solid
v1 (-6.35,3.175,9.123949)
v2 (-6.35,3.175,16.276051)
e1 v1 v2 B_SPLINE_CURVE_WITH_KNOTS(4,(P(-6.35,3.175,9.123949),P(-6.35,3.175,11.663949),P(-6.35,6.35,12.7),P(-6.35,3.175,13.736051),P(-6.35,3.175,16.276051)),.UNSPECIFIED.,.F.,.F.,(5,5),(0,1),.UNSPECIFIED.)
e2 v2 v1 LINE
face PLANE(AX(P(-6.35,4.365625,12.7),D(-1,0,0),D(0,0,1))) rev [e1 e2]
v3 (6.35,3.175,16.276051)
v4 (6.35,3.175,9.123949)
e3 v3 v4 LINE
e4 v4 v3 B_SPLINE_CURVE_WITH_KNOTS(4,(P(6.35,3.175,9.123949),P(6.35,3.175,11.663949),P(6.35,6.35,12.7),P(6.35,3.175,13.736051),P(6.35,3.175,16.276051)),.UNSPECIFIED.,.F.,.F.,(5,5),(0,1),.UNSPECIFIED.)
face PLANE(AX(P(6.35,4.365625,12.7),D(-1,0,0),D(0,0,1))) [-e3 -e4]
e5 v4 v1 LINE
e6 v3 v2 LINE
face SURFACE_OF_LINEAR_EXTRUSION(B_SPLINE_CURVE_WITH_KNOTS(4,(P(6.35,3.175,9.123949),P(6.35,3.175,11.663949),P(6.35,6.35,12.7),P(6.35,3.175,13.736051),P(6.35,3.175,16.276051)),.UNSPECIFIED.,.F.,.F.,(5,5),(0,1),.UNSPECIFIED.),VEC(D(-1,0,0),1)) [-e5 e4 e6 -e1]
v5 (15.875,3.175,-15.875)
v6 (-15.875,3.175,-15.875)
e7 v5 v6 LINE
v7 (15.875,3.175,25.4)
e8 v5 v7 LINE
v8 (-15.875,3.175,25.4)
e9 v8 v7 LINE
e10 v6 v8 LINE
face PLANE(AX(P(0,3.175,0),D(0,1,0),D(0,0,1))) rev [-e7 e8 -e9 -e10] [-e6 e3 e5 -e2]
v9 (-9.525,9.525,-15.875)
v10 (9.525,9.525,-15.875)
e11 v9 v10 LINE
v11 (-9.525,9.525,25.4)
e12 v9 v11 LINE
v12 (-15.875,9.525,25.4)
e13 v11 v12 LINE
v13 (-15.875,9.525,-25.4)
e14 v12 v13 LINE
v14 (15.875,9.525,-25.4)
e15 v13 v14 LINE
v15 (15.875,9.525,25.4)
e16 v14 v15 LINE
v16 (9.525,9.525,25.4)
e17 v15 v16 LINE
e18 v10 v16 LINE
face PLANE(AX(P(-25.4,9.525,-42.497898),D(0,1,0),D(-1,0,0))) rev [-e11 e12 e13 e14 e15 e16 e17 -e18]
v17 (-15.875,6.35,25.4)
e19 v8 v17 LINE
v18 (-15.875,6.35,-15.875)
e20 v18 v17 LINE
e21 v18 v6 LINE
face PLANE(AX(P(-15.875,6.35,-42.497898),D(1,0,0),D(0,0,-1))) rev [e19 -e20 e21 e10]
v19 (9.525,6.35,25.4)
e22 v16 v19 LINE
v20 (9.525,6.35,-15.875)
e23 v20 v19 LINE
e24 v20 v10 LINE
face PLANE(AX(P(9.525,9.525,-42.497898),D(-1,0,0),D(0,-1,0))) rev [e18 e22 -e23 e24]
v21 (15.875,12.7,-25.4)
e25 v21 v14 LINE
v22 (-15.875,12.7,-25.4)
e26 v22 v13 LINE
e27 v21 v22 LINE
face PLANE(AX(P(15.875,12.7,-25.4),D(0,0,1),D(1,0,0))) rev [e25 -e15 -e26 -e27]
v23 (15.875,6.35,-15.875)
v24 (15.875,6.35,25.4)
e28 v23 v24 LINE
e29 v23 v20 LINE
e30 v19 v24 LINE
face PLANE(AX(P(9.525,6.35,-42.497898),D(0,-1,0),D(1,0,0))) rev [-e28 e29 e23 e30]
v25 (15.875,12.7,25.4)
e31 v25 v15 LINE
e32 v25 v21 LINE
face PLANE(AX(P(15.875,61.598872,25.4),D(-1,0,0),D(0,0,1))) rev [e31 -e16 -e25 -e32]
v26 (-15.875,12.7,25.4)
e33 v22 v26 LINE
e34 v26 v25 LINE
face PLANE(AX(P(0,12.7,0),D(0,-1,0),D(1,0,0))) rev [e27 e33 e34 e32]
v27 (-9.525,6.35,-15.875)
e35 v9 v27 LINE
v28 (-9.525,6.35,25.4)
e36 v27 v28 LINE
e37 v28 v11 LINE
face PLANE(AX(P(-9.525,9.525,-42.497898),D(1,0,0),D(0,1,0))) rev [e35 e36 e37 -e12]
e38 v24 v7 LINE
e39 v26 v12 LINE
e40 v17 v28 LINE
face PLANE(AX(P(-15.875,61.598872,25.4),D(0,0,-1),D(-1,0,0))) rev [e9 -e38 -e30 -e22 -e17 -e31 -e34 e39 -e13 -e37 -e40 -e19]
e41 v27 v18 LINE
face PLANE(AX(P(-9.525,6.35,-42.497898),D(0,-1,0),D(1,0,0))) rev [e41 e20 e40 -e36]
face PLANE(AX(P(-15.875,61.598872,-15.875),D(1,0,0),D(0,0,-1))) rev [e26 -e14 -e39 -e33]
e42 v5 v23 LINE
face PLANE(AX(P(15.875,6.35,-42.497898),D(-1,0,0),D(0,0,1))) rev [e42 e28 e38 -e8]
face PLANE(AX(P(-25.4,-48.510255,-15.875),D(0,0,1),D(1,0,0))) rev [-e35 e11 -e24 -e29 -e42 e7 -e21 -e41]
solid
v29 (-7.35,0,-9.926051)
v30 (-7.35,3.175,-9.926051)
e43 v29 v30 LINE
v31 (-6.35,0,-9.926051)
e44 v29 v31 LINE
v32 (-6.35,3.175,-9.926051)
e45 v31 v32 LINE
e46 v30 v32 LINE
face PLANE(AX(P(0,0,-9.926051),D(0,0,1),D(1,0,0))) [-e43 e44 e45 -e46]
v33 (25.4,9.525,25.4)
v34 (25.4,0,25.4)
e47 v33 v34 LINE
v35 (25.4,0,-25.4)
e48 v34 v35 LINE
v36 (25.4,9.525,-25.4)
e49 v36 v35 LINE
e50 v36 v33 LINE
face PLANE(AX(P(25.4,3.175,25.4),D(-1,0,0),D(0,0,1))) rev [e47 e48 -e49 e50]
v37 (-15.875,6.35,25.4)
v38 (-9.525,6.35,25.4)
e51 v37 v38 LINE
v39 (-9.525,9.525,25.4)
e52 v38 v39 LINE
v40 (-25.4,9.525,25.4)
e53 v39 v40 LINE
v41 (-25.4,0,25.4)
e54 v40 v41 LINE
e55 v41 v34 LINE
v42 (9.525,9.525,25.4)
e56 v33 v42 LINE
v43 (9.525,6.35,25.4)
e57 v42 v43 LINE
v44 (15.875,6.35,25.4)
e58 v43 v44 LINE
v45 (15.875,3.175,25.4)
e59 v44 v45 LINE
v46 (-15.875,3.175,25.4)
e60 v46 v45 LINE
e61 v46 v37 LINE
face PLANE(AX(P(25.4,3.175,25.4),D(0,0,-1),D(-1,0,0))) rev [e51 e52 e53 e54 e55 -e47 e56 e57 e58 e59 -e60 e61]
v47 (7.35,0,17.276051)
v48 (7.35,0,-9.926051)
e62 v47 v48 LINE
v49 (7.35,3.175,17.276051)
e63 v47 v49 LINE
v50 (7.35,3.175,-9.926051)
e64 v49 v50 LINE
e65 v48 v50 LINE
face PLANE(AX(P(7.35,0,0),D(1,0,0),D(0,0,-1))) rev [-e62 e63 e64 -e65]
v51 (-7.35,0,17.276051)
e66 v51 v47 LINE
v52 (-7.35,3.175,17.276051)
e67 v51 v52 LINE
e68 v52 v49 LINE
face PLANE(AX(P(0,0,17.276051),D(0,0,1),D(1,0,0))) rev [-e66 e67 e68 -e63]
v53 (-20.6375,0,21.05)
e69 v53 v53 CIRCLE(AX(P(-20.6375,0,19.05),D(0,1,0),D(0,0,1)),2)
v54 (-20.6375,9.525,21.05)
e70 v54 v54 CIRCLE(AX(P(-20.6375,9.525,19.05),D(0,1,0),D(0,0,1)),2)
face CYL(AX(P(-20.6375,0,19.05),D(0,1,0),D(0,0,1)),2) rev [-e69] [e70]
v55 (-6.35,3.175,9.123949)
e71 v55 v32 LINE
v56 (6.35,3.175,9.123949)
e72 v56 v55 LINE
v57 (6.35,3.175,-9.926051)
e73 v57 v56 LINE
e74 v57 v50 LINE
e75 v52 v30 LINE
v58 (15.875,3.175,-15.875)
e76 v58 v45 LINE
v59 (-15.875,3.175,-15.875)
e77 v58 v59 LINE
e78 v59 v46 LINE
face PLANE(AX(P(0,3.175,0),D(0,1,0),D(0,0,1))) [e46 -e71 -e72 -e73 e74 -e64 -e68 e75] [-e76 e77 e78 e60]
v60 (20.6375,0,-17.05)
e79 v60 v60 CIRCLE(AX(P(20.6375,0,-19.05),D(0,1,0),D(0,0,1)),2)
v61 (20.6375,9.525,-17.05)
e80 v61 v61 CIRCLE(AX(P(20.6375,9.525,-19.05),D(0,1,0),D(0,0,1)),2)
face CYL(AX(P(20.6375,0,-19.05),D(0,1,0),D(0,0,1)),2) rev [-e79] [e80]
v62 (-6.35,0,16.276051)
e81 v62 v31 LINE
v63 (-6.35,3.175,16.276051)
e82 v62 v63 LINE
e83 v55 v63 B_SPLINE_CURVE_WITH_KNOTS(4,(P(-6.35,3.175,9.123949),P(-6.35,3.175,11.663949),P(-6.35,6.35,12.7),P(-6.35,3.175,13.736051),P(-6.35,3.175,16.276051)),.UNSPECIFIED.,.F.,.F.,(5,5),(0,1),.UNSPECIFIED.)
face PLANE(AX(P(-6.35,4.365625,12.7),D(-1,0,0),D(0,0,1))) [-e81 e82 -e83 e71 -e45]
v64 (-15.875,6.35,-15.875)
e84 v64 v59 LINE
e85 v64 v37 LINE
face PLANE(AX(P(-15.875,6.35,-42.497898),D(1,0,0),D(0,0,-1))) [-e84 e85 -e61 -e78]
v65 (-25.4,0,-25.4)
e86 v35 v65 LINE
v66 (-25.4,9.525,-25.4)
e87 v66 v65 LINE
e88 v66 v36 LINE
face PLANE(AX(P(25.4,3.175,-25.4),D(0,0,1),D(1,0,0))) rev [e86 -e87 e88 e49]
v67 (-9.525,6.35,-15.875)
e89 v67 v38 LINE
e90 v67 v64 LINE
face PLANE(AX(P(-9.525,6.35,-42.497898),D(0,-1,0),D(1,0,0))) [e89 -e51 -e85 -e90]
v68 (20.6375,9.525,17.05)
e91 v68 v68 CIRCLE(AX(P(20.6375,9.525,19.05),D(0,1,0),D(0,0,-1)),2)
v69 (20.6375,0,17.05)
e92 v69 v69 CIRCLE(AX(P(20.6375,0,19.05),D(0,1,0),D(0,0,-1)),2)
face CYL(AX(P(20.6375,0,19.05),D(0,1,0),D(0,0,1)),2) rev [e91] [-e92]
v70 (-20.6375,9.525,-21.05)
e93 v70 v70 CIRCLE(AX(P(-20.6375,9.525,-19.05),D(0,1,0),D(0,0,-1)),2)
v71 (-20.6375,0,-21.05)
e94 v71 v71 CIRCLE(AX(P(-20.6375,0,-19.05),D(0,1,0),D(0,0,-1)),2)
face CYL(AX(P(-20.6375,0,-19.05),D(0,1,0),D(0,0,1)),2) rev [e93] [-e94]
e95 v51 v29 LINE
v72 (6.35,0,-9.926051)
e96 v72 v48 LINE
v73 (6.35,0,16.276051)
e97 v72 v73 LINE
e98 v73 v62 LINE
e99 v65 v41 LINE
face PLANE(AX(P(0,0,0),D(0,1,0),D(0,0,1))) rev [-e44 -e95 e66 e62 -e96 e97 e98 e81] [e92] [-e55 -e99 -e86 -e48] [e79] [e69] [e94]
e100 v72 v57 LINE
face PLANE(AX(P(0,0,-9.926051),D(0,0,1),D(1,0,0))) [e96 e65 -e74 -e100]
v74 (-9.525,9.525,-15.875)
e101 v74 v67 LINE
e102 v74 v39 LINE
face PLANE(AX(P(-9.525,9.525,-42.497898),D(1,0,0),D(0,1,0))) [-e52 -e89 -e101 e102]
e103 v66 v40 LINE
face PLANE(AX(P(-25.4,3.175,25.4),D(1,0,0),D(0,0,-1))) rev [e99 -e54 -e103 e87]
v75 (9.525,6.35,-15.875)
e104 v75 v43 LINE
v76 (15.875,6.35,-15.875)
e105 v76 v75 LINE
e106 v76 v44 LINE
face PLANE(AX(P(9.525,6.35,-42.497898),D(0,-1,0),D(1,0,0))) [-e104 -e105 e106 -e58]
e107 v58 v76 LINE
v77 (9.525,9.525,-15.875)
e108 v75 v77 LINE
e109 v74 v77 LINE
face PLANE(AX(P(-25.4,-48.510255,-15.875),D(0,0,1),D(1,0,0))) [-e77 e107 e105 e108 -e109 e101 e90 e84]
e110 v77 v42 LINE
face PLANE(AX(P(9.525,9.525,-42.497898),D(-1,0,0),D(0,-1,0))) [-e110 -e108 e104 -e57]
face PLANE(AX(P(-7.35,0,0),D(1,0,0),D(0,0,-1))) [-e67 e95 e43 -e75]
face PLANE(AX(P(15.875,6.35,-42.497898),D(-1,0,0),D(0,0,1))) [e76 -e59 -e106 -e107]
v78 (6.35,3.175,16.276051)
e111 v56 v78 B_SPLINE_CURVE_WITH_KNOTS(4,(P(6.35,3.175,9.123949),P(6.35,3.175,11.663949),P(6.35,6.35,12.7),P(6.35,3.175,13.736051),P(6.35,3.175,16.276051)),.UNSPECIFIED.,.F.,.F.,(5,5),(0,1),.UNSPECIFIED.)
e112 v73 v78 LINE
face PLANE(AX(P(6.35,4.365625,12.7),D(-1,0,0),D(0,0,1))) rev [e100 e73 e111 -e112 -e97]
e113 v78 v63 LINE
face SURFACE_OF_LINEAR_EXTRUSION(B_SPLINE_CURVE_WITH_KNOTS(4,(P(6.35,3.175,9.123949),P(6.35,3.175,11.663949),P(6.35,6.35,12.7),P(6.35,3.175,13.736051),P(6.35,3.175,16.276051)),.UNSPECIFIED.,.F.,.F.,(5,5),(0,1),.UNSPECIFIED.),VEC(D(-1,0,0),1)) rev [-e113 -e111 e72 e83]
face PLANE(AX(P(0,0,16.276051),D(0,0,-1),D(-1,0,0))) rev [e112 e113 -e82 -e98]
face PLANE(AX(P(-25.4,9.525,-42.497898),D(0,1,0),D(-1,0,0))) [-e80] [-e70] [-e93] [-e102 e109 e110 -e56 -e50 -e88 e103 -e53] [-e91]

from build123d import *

# Parameters (mm, degrees)
SKETCH1_W              = 50.8
SKETCH1_H              = 50.8
BOSS_EXTRUDE1_DEPTH    = 3.175
BOSS_EXTRUDE5_DEPTH    = 6.35
CUT_EXTRUDE1_DEPTH     = 37.061067996
BOSS_EXTRUDE2_DEPTH    = 50.8
BOSS_EXTRUDE6_REACH    = 39.162
SKETCH10_W             = 50.8
SKETCH10_H             = 9.525
SKETCH12_R             = 2
CUT_EXTRUDE2_DEPTH     = 38.162422242
SKETCH15_W             = 31.75
SKETCH15_H             = 41.275
BOSS_EXTRUDE8_DEPTH    = 6.35
SKETCH16_W             = 31.75
SKETCH16_H             = 50.8
BOSS_EXTRUDE9_DEPTH    = 3.175
INTERSECT4_START       = -15.875
INTERSECT4_OUTLINE_W   = 3.175
INTERSECT4_OUTLINE_H   = 50.8
INTERSECT4_DEPTH       = 31.75
INTERSECT4_START_2     = -9.525
INTERSECT4_2_OUTLINE_W = 3.175
INTERSECT4_2_OUTLINE_H = 41.275
INTERSECT4_2_DEPTH     = 19.05
INTERSECT4_3_DEPTH     = 9.525
INTERSECT4_START_3     = 6.35
INTERSECT4_4_DEPTH     = 9.525
INTERSECT4_5_OUTLINE_R = 2
INTERSECT4_5_DEPTH     = 9.525
INTERSECT4_6_OUTLINE_W = 31.75
INTERSECT4_6_OUTLINE_H = 41.275
INTERSECT4_6_DEPTH     = 3.175


with BuildPart() as part:
    # Sketch1 → Boss-Extrude1 (new body)
    with BuildSketch(Plane(origin=(0, 0, 0), x_dir=(1, 0, 0), z_dir=(0, 1, 0))):
        Rectangle(SKETCH1_W, SKETCH1_H)
    extrude(amount=BOSS_EXTRUDE1_DEPTH)

    # Sketch7 → Boss-Extrude5 (add, symmetric)
    with BuildSketch(Plane(origin=(0, 0, 0), x_dir=(0, 0, -1), z_dir=(1, 0, 0))):
        with BuildLine():
            Line((-16.276050722, 3.175), (-9.123949278, 3.175))
            add(Edge.make_bspline(
                [(-16.276050722, 3.175), (-13.736050722, 3.175), (-12.7, 6.35), (-11.663949278, 3.175), (-9.123949278, 3.175)],
                knots=[0, 0, 0, 0, 0, 1, 1, 1, 1, 1], degree=4))
        make_face()
    extrude(amount=BOSS_EXTRUDE5_DEPTH, both=True)

    # Sketch8 → Cut-Extrude1 (cut, through all)
    with BuildSketch(Plane(origin=(0, 3.175, 0), x_dir=(1, 0, 0), z_dir=(0, 1, 0))):
        Polygon((-6.35, -16.276050722), (-6.35, -9.123949278), (-6.35, 9.926050722), (-7.35, 9.926050722), (-7.35, -9.123949278), (-7.35, -17.276050722), (7.35, -17.276050722), (7.35, -9.123949278), (7.35, 9.926050722), (6.35, 9.926050722), (6.35, -9.123949278), (6.35, -16.276050722), align=None)
    extrude(amount=-CUT_EXTRUDE1_DEPTH, mode=Mode.SUBTRACT)

    # Sketch3 → Boss-Extrude2 (add)
    with BuildSketch(Plane.XY.offset(25.4)):
        Polygon((-15.875, 3.175), (-25.4, 3.175), (-25.4, 9.525), (-9.525, 9.525), (-9.525, 6.35), (-15.875, 6.35), align=None)
        Polygon((9.525, 6.35), (15.875, 6.35), (15.875, 3.175), (25.4, 3.175), (25.4, 9.525), (9.525, 9.525), align=None)
    extrude(amount=-BOSS_EXTRUDE2_DEPTH)

    # Boss-Extrude6: up to this face of the body (flat: up to its plane)
    boss_extrude6_end = Plane(part.part.faces().sort_by_distance((0, 3.175, -1.076695791))[0])
    # Sketch10 → Boss-Extrude6 (add, up to the picked face)
    with BuildSketch(Plane(origin=(0, 9.525, 0), x_dir=(1, 0, 0), z_dir=(0, 1, 0)), mode=Mode.PRIVATE) as boss_extrude6_sk1:
        with Locations((0, 20.6375)):
            Rectangle(SKETCH10_W, SKETCH10_H)
    boss_extrude6_tool1 = split(extrude(boss_extrude6_sk1.sketch, amount=-BOSS_EXTRUDE6_REACH, mode=Mode.PRIVATE), bisect_by=boss_extrude6_end, keep=Keep.BOTH, mode=Mode.PRIVATE)
    add(boss_extrude6_tool1.solids().sort_by(Axis((0, 9.525, -20.6375), (0, -1, 0)))[0])

    # Sketch12 → Cut-Extrude2 (cut, through all)
    with BuildSketch(Plane(origin=(0, 9.525, 0), x_dir=(1, 0, 0), z_dir=(0, 1, 0))):
        with Locations(Location((-20.6375, -19.05, 0), (0, 0, 270))):
            Circle(SKETCH12_R)
        with Locations(Location((20.6375, -19.05, 0), (0, 0, 90))):
            Circle(SKETCH12_R)
        with Locations(Location((20.6375, 19.05, 0), (0, 0, 270))):
            Circle(SKETCH12_R)
        with Locations(Location((-20.6375, 19.05, 0), (0, 0, 90))):
            Circle(SKETCH12_R)
    extrude(amount=-CUT_EXTRUDE2_DEPTH, mode=Mode.SUBTRACT)


with BuildPart() as body_2:
    # Sketch15 → Boss-Extrude8 (new body)
    with BuildSketch(Plane(origin=(0, 3.175, 0), x_dir=(1, 0, 0), z_dir=(0, 1, 0))):
        with Locations((0, -4.7625)):
            Rectangle(SKETCH15_W, SKETCH15_H)
    extrude(amount=BOSS_EXTRUDE8_DEPTH)

    # Sketch16 → Boss-Extrude9 (add)
    with BuildSketch(Plane(origin=(0, 9.525, 0), x_dir=(1, 0, 0), z_dir=(0, 1, 0))):
        Rectangle(SKETCH16_W, SKETCH16_H)
    extrude(amount=BOSS_EXTRUDE9_DEPTH)


with BuildPart() as body_3:
    # Intersect4: read off the stored shape, not the designer's step
    # Intersect4 outline → Intersect4 (new body)
    with BuildSketch(Plane.YZ.offset(INTERSECT4_START)):
        with BuildLine():
            add(Edge.make_bspline(
                [(3.175, 9.123949278), (3.175, 11.663949278), (6.35, 12.7), (3.175, 13.736050722), (3.175, 16.276050722)],
                knots=[0, 0, 0, 0, 0, 1, 1, 1, 1, 1], degree=4))
            Line((3.175, 9.123949278), (3.175, -15.875))
            Line((3.175, -15.875), (6.35, -15.875))
            Line((6.35, -15.875), (6.35, 25.4))
            Line((6.35, 25.4), (3.175, 25.4))
            Line((3.175, 25.4), (3.175, 16.276050722))
        make_face()
        with Locations((11.1125, 0)):
            Rectangle(INTERSECT4_OUTLINE_W, INTERSECT4_OUTLINE_H)
    extrude(amount=INTERSECT4_DEPTH)

    # Intersect4 2 outline → Intersect4 2 (add)
    with BuildSketch(Plane.YZ.offset(INTERSECT4_START_2)):
        with Locations((7.9375, 4.7625)):
            Rectangle(INTERSECT4_2_OUTLINE_W, INTERSECT4_2_OUTLINE_H)
    extrude(amount=INTERSECT4_2_DEPTH)

    # Intersect4 3 outline → Intersect4 3 (add)
    with BuildSketch(Plane.YZ.offset(INTERSECT4_START)):
        with BuildLine():
            Line((3.175, 16.276050722), (3.175, 9.123949278))
            add(Edge.make_bspline(
                [(3.175, 9.123949278), (3.175, 11.663949278), (6.35, 12.7), (3.175, 13.736050722), (3.175, 16.276050722)],
                knots=[0, 0, 0, 0, 0, 1, 1, 1, 1, 1], degree=4))
        make_face()
    extrude(amount=INTERSECT4_3_DEPTH)

    # Intersect4 4 outline → Intersect4 4 (add)
    with BuildSketch(Plane.YZ.offset(INTERSECT4_START_3)):
        with BuildLine():
            Line((3.175, 16.276050722), (3.175, 9.123949278))
            add(Edge.make_bspline(
                [(3.175, 9.123949278), (3.175, 11.663949278), (6.35, 12.7), (3.175, 13.736050722), (3.175, 16.276050722)],
                knots=[0, 0, 0, 0, 0, 1, 1, 1, 1, 1], degree=4))
        make_face()
    extrude(amount=INTERSECT4_4_DEPTH)


with BuildPart() as body_4:
    # Intersect4 5 outline → Intersect4 5 (new body)
    with BuildSketch(Plane(origin=(0, 0, 0), x_dir=(1, 0, 0), z_dir=(0, 1, 0))):
        Polygon((-15.875, 15.875), (15.875, 15.875), (15.875, -25.4), (25.4, -25.4), (25.4, 25.4), (-25.4, 25.4), (-25.4, -25.4), (-15.875, -25.4), align=None)
        with Locations((-20.6375, -19.05)):
            Circle(INTERSECT4_5_OUTLINE_R, mode=Mode.SUBTRACT)
        with Locations((20.6375, -19.05)):
            Circle(INTERSECT4_5_OUTLINE_R, mode=Mode.SUBTRACT)
        with Locations((-20.6375, 19.05)):
            Circle(INTERSECT4_5_OUTLINE_R, mode=Mode.SUBTRACT)
        with Locations((20.6375, 19.05)):
            Circle(INTERSECT4_5_OUTLINE_R, mode=Mode.SUBTRACT)
    extrude(amount=INTERSECT4_5_DEPTH)

    # Intersect4 6 outline → Intersect4 6 (add)
    with BuildSketch(Plane(origin=(0, 0, 0), x_dir=(1, 0, 0), z_dir=(0, 1, 0))):
        with Locations((0, -4.7625)):
            Rectangle(INTERSECT4_6_OUTLINE_W, INTERSECT4_6_OUTLINE_H)
        Polygon((7.35, 9.926050722), (7.35, -17.276050722), (-7.35, -17.276050722), (-7.35, 9.926050722), (-6.35, 9.926050722), (-6.35, -16.276050722), (6.35, -16.276050722), (6.35, 9.926050722), align=None, mode=Mode.SUBTRACT)
    extrude(amount=INTERSECT4_6_DEPTH)


solid = Compound([part.part, body_3.part])
